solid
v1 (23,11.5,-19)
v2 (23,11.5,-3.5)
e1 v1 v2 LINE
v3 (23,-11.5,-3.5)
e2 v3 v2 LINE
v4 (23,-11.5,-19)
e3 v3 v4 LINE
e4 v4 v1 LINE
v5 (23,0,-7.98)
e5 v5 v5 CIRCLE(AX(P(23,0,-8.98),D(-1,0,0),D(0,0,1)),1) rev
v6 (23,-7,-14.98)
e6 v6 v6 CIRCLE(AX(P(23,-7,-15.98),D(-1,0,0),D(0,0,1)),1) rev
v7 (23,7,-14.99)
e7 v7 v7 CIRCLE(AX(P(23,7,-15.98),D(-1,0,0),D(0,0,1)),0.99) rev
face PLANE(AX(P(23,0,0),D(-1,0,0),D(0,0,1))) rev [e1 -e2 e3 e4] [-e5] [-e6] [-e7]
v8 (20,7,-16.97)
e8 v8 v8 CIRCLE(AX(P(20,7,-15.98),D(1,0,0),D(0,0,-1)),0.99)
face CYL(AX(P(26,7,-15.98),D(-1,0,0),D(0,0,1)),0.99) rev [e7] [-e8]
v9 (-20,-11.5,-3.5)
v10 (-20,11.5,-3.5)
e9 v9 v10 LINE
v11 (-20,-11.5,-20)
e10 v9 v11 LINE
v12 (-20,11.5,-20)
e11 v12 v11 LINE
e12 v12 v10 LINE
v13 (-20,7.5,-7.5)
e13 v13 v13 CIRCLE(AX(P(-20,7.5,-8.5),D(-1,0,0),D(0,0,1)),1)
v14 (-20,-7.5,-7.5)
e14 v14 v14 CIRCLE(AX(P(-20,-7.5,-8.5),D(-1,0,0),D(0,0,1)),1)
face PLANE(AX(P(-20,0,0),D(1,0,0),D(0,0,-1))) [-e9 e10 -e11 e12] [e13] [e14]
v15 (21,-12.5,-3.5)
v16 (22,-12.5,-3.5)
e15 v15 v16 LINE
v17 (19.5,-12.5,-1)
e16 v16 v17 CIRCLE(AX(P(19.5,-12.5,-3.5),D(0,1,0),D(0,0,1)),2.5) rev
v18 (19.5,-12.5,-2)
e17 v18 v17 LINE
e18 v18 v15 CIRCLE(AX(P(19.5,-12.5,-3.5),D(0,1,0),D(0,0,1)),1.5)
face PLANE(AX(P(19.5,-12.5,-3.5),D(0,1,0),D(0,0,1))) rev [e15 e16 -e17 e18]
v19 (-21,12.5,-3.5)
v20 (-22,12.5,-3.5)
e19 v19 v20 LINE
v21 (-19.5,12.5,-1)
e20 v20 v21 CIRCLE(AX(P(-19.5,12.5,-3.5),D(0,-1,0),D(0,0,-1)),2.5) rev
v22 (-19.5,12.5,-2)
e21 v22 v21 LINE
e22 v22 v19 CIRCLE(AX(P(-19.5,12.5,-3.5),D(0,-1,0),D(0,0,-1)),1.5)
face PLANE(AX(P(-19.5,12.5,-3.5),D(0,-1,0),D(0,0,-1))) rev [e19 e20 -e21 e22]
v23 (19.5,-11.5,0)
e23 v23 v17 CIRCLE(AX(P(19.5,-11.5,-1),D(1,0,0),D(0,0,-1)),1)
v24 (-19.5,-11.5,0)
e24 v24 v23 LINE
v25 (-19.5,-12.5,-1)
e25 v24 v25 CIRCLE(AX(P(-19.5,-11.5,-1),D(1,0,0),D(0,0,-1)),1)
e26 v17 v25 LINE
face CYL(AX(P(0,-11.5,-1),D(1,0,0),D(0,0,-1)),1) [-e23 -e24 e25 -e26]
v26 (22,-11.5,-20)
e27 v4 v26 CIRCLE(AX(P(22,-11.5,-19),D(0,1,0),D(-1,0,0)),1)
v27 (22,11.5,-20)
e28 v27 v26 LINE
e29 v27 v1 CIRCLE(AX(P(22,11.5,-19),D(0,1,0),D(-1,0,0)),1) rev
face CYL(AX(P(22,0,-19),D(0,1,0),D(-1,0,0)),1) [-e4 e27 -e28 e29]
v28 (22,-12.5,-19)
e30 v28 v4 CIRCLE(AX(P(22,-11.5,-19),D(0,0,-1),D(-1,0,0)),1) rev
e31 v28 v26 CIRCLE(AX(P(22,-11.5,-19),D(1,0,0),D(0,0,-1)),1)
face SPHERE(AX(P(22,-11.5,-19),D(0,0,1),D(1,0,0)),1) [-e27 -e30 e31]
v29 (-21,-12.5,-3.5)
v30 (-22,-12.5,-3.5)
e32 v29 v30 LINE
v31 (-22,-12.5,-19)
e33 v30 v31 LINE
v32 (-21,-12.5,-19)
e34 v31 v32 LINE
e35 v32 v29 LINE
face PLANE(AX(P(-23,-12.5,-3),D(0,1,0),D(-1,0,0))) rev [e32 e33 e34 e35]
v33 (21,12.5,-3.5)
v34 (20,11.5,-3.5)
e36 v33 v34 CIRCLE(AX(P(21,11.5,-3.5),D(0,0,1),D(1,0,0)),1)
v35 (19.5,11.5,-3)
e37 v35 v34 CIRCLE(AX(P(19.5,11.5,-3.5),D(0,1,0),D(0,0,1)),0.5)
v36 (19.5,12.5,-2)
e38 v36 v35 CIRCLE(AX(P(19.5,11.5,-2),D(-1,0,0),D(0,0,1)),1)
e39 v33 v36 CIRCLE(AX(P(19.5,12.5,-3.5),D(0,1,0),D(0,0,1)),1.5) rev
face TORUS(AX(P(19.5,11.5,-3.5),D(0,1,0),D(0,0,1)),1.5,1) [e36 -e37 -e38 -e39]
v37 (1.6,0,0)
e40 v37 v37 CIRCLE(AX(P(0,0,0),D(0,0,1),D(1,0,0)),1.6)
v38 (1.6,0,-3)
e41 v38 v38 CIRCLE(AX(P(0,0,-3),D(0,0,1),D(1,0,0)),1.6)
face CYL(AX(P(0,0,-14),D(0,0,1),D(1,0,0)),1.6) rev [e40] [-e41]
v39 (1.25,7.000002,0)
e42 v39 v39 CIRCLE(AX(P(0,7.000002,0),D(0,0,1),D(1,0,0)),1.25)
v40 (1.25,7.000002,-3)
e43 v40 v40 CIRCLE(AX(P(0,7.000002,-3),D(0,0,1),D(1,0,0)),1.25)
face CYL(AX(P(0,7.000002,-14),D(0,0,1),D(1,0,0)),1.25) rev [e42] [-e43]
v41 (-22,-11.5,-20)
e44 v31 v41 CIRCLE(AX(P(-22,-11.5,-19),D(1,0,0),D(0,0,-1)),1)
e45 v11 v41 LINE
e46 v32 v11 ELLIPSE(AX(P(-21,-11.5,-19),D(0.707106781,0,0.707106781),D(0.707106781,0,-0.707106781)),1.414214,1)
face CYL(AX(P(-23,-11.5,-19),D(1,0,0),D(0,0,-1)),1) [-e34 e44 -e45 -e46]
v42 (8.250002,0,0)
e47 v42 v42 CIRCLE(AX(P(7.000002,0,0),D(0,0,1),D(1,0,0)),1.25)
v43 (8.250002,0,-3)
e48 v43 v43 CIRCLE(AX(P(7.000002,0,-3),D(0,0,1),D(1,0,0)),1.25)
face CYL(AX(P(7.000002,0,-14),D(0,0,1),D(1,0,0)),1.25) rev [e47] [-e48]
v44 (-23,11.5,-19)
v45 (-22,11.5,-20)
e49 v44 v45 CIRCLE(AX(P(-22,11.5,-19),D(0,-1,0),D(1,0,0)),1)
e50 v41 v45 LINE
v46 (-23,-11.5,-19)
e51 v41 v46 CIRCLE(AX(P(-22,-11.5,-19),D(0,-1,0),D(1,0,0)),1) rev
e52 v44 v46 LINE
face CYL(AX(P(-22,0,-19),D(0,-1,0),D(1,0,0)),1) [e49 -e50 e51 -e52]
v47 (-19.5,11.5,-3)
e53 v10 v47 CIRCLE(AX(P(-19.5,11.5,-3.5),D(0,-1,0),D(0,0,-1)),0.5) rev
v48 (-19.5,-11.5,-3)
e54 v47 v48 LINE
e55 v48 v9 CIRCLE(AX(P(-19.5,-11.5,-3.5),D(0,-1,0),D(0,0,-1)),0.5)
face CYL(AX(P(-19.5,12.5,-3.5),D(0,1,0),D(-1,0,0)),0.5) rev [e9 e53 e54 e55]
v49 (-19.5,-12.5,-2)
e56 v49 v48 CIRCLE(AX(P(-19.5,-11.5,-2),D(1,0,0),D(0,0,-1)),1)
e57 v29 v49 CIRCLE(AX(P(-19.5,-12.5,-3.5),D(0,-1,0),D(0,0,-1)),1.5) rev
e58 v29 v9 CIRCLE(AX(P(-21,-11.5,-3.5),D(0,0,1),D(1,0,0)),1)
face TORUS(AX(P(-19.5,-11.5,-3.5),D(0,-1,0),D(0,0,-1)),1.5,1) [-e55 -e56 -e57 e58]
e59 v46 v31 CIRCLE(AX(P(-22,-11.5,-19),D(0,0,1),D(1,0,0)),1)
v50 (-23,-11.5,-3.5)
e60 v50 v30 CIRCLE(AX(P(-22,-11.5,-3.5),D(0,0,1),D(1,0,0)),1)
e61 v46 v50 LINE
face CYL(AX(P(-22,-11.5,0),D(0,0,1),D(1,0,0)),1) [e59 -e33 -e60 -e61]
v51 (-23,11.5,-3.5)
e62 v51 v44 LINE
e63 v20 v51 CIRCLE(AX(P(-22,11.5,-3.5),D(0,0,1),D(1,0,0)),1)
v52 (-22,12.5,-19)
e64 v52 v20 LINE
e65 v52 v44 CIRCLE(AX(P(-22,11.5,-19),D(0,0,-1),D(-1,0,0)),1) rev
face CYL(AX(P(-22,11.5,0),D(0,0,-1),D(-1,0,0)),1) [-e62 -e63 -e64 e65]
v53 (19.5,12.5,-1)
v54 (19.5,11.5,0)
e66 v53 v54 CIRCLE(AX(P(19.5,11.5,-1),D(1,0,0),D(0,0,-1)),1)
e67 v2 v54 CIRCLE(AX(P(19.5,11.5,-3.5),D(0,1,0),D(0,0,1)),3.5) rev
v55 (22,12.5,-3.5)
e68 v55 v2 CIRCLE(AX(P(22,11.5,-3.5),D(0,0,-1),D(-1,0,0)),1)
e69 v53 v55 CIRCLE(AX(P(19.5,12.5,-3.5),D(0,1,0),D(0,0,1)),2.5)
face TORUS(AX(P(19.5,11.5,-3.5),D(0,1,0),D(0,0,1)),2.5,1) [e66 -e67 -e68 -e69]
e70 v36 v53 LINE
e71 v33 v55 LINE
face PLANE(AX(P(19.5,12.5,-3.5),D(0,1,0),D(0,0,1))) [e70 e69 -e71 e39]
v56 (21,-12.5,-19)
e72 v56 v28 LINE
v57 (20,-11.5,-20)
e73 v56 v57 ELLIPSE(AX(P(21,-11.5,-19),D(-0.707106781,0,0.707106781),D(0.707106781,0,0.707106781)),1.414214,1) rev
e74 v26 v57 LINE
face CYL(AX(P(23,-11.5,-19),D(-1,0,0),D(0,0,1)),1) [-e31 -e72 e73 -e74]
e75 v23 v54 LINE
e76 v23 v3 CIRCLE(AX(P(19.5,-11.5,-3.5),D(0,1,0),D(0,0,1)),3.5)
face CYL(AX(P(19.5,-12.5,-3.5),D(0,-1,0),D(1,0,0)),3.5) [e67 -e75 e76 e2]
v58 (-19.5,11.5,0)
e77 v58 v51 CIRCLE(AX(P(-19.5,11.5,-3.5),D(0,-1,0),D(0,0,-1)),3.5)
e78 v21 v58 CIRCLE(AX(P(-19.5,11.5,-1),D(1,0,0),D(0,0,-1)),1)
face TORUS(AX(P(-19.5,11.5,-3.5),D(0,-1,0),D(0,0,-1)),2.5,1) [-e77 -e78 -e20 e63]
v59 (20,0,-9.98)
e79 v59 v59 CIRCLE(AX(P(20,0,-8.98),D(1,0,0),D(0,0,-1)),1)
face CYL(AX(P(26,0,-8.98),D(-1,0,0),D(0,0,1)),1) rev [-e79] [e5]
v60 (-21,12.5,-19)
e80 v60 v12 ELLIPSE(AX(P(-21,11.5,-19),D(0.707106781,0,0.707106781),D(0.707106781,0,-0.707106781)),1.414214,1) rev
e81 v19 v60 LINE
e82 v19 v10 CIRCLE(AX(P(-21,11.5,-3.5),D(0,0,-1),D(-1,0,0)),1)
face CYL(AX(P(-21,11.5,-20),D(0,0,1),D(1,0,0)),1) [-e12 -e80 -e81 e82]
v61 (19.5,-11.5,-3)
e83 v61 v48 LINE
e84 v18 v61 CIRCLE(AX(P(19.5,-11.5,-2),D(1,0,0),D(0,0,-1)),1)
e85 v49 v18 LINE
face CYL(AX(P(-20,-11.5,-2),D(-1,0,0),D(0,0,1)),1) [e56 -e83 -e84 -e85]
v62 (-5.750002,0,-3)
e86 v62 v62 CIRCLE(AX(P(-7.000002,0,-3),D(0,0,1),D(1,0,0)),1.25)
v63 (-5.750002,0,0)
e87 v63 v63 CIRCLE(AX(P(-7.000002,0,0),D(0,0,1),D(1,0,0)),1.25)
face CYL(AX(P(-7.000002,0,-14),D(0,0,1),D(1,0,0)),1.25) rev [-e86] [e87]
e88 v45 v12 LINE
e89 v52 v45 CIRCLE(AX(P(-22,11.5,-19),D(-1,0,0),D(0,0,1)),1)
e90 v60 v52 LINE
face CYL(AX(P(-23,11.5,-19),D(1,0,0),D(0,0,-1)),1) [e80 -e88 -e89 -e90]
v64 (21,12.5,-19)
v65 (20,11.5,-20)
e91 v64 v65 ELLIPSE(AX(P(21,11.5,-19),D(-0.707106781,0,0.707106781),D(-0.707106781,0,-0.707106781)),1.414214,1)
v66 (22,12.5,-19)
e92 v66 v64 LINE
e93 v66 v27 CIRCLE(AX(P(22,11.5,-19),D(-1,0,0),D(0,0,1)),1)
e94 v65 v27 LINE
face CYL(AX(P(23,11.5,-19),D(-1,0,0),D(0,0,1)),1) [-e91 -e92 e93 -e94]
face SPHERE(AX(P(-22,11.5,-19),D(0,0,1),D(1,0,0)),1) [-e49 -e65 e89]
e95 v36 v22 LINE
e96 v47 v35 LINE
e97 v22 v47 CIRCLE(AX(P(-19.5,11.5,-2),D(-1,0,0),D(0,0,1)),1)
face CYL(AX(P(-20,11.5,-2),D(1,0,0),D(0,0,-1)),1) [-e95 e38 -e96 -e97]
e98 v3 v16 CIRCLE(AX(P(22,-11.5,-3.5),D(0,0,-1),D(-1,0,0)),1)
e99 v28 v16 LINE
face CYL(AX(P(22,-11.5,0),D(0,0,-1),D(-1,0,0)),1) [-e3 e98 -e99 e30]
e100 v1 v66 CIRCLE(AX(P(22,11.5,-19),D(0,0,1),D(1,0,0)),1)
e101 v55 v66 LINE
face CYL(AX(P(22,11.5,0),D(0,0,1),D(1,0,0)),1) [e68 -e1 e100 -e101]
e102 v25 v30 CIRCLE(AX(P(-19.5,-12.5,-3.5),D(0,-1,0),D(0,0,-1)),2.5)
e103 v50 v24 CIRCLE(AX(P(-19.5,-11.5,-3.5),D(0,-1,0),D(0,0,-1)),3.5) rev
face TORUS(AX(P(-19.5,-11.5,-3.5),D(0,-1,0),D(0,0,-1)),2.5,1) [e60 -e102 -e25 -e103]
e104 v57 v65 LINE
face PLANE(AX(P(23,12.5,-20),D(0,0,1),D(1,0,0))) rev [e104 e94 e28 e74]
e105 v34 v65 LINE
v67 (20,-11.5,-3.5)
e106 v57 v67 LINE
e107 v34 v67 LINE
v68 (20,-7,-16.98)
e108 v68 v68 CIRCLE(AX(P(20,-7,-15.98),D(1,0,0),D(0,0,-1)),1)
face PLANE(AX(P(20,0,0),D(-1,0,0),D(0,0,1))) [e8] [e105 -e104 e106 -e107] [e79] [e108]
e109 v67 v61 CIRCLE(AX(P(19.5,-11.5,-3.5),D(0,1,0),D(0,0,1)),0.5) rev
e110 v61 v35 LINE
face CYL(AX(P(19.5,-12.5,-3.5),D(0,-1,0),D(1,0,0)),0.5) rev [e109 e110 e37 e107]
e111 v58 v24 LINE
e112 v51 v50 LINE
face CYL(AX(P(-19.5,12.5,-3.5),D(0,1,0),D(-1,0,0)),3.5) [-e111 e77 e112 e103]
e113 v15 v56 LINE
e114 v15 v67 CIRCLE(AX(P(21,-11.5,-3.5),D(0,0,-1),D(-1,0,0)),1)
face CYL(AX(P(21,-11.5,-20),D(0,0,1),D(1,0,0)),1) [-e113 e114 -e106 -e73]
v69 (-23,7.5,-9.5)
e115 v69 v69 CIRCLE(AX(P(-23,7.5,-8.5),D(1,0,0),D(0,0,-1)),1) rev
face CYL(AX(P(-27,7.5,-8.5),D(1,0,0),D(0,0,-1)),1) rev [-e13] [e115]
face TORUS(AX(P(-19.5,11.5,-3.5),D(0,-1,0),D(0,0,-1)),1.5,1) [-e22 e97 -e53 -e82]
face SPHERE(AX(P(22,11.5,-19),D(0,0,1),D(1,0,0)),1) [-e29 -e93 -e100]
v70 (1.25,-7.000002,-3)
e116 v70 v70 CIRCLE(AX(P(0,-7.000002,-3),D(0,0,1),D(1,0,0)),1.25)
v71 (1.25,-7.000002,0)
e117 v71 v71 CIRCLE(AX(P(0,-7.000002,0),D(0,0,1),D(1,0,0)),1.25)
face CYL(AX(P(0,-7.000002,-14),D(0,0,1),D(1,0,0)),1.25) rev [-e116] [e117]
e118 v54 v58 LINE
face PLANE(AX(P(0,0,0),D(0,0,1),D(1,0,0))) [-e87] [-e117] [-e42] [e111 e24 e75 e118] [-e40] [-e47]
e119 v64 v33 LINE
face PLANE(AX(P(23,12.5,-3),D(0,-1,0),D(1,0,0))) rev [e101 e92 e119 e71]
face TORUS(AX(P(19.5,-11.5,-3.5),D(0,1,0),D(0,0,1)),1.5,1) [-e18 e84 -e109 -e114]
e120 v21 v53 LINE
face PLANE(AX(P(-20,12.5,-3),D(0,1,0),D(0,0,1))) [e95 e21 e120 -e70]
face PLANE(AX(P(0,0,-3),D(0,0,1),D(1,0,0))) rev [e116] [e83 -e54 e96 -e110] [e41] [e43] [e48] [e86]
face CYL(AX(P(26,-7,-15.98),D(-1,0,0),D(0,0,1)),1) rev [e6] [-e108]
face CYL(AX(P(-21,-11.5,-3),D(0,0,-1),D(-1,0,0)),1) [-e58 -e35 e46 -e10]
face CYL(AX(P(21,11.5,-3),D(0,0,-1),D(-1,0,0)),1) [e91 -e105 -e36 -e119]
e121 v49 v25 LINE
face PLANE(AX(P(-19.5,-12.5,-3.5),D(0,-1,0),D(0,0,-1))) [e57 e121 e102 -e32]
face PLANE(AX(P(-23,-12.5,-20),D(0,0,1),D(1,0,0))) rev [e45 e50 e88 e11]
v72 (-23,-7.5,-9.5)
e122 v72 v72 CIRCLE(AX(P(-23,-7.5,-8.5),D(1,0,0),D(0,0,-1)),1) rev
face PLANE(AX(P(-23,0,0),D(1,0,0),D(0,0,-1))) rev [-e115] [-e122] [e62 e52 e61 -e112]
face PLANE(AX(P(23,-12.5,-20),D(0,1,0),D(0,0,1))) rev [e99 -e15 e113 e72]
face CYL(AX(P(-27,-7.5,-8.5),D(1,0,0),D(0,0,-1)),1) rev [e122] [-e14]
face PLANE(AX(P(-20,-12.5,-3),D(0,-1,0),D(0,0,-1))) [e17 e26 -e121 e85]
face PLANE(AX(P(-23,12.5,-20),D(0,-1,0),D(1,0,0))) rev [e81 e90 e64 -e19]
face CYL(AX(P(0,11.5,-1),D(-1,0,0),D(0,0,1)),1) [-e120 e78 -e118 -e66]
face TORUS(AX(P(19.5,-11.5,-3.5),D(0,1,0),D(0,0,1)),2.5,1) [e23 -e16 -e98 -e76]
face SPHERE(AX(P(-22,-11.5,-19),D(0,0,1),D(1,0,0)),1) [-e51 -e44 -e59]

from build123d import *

# Parameters (mm, degrees)
SKETCH1_W                    = 40
SKETCH1_H                    = 25
BASE_FLANGE1_DEPTH           = 3
EDGE_FLANGE1_STRIP_W         = 13
EDGE_FLANGE1_STRIP_H         = 3
EDGE_FLANGE1_STRIP_CUT_DEPTH = 25
EDGE_FLANGE1_DEPTH           = 25
EDGE_FLANGE2_STRIP_W         = 13
EDGE_FLANGE2_STRIP_H         = 3
EDGE_FLANGE2_STRIP_CUT_DEPTH = 25
EDGE_FLANGE2_DEPTH           = 25
CUT_EXTRUDE1_DEPTH           = 7
CUT_EXTRUDE2_DEPTH           = 6
FILLET1_R                    = 1
FILLET2_R                    = 1
CUT_EXTRUDE3_DEPTH           = 14


# Sheet-metal steps are written as plain solids
with BuildPart() as part:
    # Sketch1 → Base-Flange1 (new body)
    with BuildSketch(Plane.XY):
        Rectangle(SKETCH1_W, SKETCH1_H)
    extrude(amount=-BASE_FLANGE1_DEPTH)

    # Edge-Flange1 strip (across the edge) → Edge-Flange1 strip cut (cut)
    with BuildSketch(Plane(origin=(20, 12.5, -3), x_dir=(-1, 0, 0), z_dir=(0, -1, 0))):
        with Locations((-6, -1.5)):
            Rectangle(EDGE_FLANGE1_STRIP_W, EDGE_FLANGE1_STRIP_H)
    extrude(amount=EDGE_FLANGE1_STRIP_CUT_DEPTH, mode=Mode.SUBTRACT)

    # Edge-Flange1 section (across the edge) → Edge-Flange1 (add)
    with BuildSketch(Plane(origin=(20, 12.5, -3), x_dir=(-1, 0, 0), z_dir=(0, -1, 0))):
        with BuildLine():
            Line((-3, 0.5), (-3, 17))
            Line((-3, 17), (0, 17))
            Line((0, 17), (0, 0.5))
            ThreePointArc((0, 0.5), (0.146446609, 0.146446609), (0.5, 0))
            Line((0.5, 0), (0.5, -3))
            ThreePointArc((0.5, -3), (-1.974873734, -1.974873734), (-3, 0.5))
        make_face()
    extrude(amount=EDGE_FLANGE1_DEPTH)

    # Edge-Flange2 strip (across the edge) → Edge-Flange2 strip cut (cut)
    with BuildSketch(Plane(origin=(-20, -12.5, -3), x_dir=(1, 0, 0), z_dir=(0, 1, 0))):
        with Locations((-6, -1.5)):
            Rectangle(EDGE_FLANGE2_STRIP_W, EDGE_FLANGE2_STRIP_H)
    extrude(amount=EDGE_FLANGE2_STRIP_CUT_DEPTH, mode=Mode.SUBTRACT)

    # Edge-Flange2 section (across the edge) → Edge-Flange2 (add)
    with BuildSketch(Plane(origin=(-20, -12.5, -3), x_dir=(1, 0, 0), z_dir=(0, 1, 0))):
        with BuildLine():
            Line((-3, 0.5), (-3, 17))
            Line((-3, 17), (0, 17))
            Line((0, 17), (0, 0.5))
            ThreePointArc((0, 0.5), (0.146446609, 0.146446609), (0.5, 0))
            Line((0.5, 0), (0.5, -3))
            ThreePointArc((0.5, -3), (-1.974873734, -1.974873734), (-3, 0.5))
        make_face()
    extrude(amount=EDGE_FLANGE2_DEPTH)

    # Sketch12 → Cut-Extrude1 (cut)
    with BuildSketch(Plane(origin=(-20, 10.212212675, -95), x_dir=(0, -1, 0), z_dir=(-1, 0, 0))):
        with BuildLine():
            ThreePointArc((17.712212658, 87.5), (16.712212675, 86.499999984), (17.712212691, 85.5))
            ThreePointArc((17.712212691, 85.5), (18.712212675, 86.500000016), (17.712212658, 87.5))
        make_face()
        with BuildLine():
            ThreePointArc((2.712212658, 87.5), (1.712212675, 86.499999984), (2.712212691, 85.5))
            ThreePointArc((2.712212691, 85.5), (3.712212675, 86.500000016), (2.712212658, 87.5))
        make_face()
    extrude(amount=CUT_EXTRUDE1_DEPTH, mode=Mode.SUBTRACT)

    # Sketch13 → Cut-Extrude2 (cut)
    with BuildSketch(Plane(origin=(20, 10.212212675, -95), x_dir=(0, 1, 0), z_dir=(1, 0, 0))):
        with BuildLine():
            ThreePointArc((-3.21221269, 80.01), (-4.202212675, 79.019999984), (-3.212212659, 78.03))
            ThreePointArc((-3.212212659, 78.03), (-2.222212675, 79.020000016), (-3.21221269, 80.01))
        make_face()
        with BuildLine():
            ThreePointArc((-17.212212691, 80.02), (-18.212212675, 79.019999984), (-17.212212658, 78.02))
            ThreePointArc((-17.212212658, 78.02), (-16.212212675, 79.020000016), (-17.212212691, 80.02))
        make_face()
        with BuildLine():
            ThreePointArc((-10.212212691, 87.02), (-11.212212675, 86.019999984), (-10.212212658, 85.02))
            ThreePointArc((-10.212212658, 85.02), (-9.212212675, 86.020000016), (-10.212212691, 87.02))
        make_face()
    extrude(amount=CUT_EXTRUDE2_DEPTH, mode=Mode.SUBTRACT)

    # Fillet1
    fillet1_edges = [part.edges().sort_by_distance(p)[0] for p in [
        (0, 12.5, 0),
        (21.974873734, 12.5, -1.025126266),
        (21.974873734, -12.5, -1.025126266),
        (23, -12.5, -11.75),
        (23, 0, -20),
        (23, 12.5, -11.75),
        (0, -12.5, 0),
        (-21.974873734, -12.5, -1.025126266),
        (-21.974873734, 12.5, -1.025126266),
        (-23, 12.5, -11.75),
        (-23, 0, -20),
        (-23, -12.5, -11.75),
    ]]
    fillet(fillet1_edges, radius=FILLET1_R)

    # Fillet2
    # the kernel refuses this fillet: 1 mm, written as the material it takes off along each edge
    with BuildSketch(Plane(origin=(-22, 11.5, -19), x_dir=(0, 0, -1), z_dir=(0, 1, 0))) as fillet2_piece_1_section:
        Polygon((0, 0), (FILLET2_R, 0), (FILLET2_R, FILLET2_R), (0, FILLET2_R), align=None)
    fillet2_piece_1 = extrude(amount=FILLET2_R, mode=Mode.PRIVATE)
    fillet2_piece_1 = fillet2_piece_1 - Plane(origin=(-22, 11.5, -19), x_dir=(0.70710678118655, 0, 0.707106781186545), z_dir=(0, 1, 0)) * Sphere(FILLET2_R, mode=Mode.PRIVATE)
    add(fillet2_piece_1, mode=Mode.SUBTRACT)
    with BuildSketch(Plane(origin=(-22, -11.5, -19), x_dir=(0, -1, 0), z_dir=(0, 0, -1))) as fillet2_piece_2_section:
        Polygon((0, 0), (FILLET2_R, 0), (FILLET2_R, FILLET2_R), (0, FILLET2_R), align=None)
    fillet2_piece_2 = extrude(amount=FILLET2_R, mode=Mode.PRIVATE)
    fillet2_piece_2 = fillet2_piece_2 - Plane(origin=(-22, -11.5, -19), x_dir=(0.7071067811865475, 0.7071067811865477, -2.4688501310822653e-15), z_dir=(0, 0, -1)) * Sphere(FILLET2_R, mode=Mode.PRIVATE)
    add(fillet2_piece_2, mode=Mode.SUBTRACT)
    with BuildSketch(Plane(origin=(22, 11.5, -19), x_dir=(0, 0, -1), z_dir=(0, 1, 0))) as fillet2_piece_3_section:
        Polygon((0, 0), (FILLET2_R, 0), (FILLET2_R, -FILLET2_R), (0, -FILLET2_R), align=None)
    fillet2_piece_3 = extrude(amount=FILLET2_R, mode=Mode.PRIVATE)
    fillet2_piece_3 = fillet2_piece_3 - Plane(origin=(22, 11.5, -19), x_dir=(-0.70710678118655, 0, 0.707106781186545), z_dir=(0, 1, 0)) * Sphere(FILLET2_R, mode=Mode.PRIVATE)
    add(fillet2_piece_3, mode=Mode.SUBTRACT)
    with BuildSketch(Plane(origin=(22, -11.5, -19), x_dir=(0, -1, 0), z_dir=(0, 0, -1))) as fillet2_piece_4_section:
        Polygon((0, 0), (FILLET2_R, 0), (FILLET2_R, -FILLET2_R), (0, -FILLET2_R), align=None)
    fillet2_piece_4 = extrude(amount=FILLET2_R, mode=Mode.PRIVATE)
    fillet2_piece_4 = fillet2_piece_4 - Plane(origin=(22, -11.5, -19), x_dir=(-0.7071067811865475, 0.7071067811865477, -2.4688501310822653e-15), z_dir=(0, 0, -1)) * Sphere(FILLET2_R, mode=Mode.PRIVATE)
    add(fillet2_piece_4, mode=Mode.SUBTRACT)
    with BuildSketch(Plane(origin=(22, -12.5, -20), x_dir=(0, 1, 0), z_dir=(-1, 0, 0)), Plane(origin=(22, 12.5, -20), x_dir=(0, 0, 1), z_dir=(-1, 0, 0))) as fillet2_piece_5:
        with BuildLine():
            CenterArc((FILLET2_R, -FILLET2_R), FILLET2_R, 90, 90)
            Line((0, -FILLET2_R), (0, 0))
            Line((0, 0), (FILLET2_R, 0))
        make_face()
    extrude(amount=4.5, mode=Mode.SUBTRACT)
    with BuildSketch(Plane(origin=(-22, -12.5, -20), x_dir=(0, 1, 0), z_dir=(1, 0, 0)), Plane(origin=(-22, 12.5, -20), x_dir=(0, 0, 1), z_dir=(1, 0, 0))) as fillet2_piece_6:
        with BuildLine():
            CenterArc((FILLET2_R, FILLET2_R), FILLET2_R, 180, 90)
            Line((0, FILLET2_R), (0, 0))
            Line((0, 0), (FILLET2_R, 0))
        make_face()
    extrude(amount=4.5, mode=Mode.SUBTRACT)
    with BuildSketch(Plane(origin=(-19.5, 12.5, -3), x_dir=(0, 0, 1), z_dir=(1, 0, 0))) as fillet2_piece_7:
        with BuildLine():
            CenterArc((FILLET2_R, FILLET2_R), FILLET2_R, 180, 90)
            Line((0, FILLET2_R), (0, 0))
            Line((0, 0), (FILLET2_R, 0))
        make_face()
    extrude(amount=39, mode=Mode.SUBTRACT)
    with BuildSketch(Plane(origin=(19.5, 12.5, -3.5), x_dir=(1, 0, 0), z_dir=(0, 0, -1))) as fillet2_piece_8:
        with BuildLine():
            CenterArc((0.5 + FILLET2_R, FILLET2_R), FILLET2_R, 180, 90)
            Line((0.5, FILLET2_R), (0.5, 0))
            Line((0.5, 0), (0.5 + FILLET2_R, 0))
        make_face()
    revolve(axis=Axis((19.5, 12.5, -3.5), (0, -1, 0)), revolution_arc=90, mode=Mode.SUBTRACT)
    with BuildSketch(Plane(origin=(19.5, -12.5, -3.5), x_dir=(1, 0, 0), z_dir=(0, 0, -1))) as fillet2_piece_9:
        with BuildLine():
            CenterArc((0.5 + FILLET2_R, -FILLET2_R), FILLET2_R, 90, 90)
            Line((0.5 + FILLET2_R, 0), (0.5, 0))
            Line((0.5, 0), (0.5, -FILLET2_R))
        make_face()
    revolve(axis=Axis((19.5, -12.5, -3.5), (0, -1, 0)), revolution_arc=90, mode=Mode.SUBTRACT)
    with BuildSketch(Plane(origin=(20, -12.5, -22.5), x_dir=(0, 1, 0), z_dir=(0, 0, 1)), Plane(origin=(20, 12.5, -22.5), x_dir=(1, 0, 0), z_dir=(0, 0, 1))) as fillet2_piece_10:
        with BuildLine():
            CenterArc((FILLET2_R, -FILLET2_R), FILLET2_R, 90, 90)
            Line((0, -FILLET2_R), (0, 0))
            Line((0, 0), (FILLET2_R, 0))
        make_face()
    extrude(amount=19, mode=Mode.SUBTRACT)
    with BuildSketch(Plane(origin=(19.5, -12.5, -3), x_dir=(0, 1, 0), z_dir=(-1, 0, 0))) as fillet2_piece_11:
        with BuildLine():
            CenterArc((FILLET2_R, -FILLET2_R), FILLET2_R, 90, 90)
            Line((0, -FILLET2_R), (0, 0))
            Line((0, 0), (FILLET2_R, 0))
        make_face()
    extrude(amount=39, mode=Mode.SUBTRACT)
    with BuildSketch(Plane(origin=(-19.5, -12.5, -3.5), x_dir=(-1, 0, 0), z_dir=(0, 0, -1))) as fillet2_piece_12:
        with BuildLine():
            CenterArc((0.5 + FILLET2_R, FILLET2_R), FILLET2_R, 180, 90)
            Line((0.5 + FILLET2_R, 0), (0.5, 0))
            Line((0.5, 0), (0.5, FILLET2_R))
        make_face()
    revolve(axis=Axis((-19.5, -12.5, -3.5), (0, 1, 0)), revolution_arc=90, mode=Mode.SUBTRACT)
    with BuildSketch(Plane(origin=(-19.5, 12.5, -3.5), x_dir=(-1, 0, 0), z_dir=(0, 0, -1))) as fillet2_piece_13:
        with BuildLine():
            CenterArc((0.5 + FILLET2_R, -FILLET2_R), FILLET2_R, 90, 90)
            Line((0.5, -FILLET2_R), (0.5, 0))
            Line((0.5, 0), (0.5 + FILLET2_R, 0))
        make_face()
    revolve(axis=Axis((-19.5, 12.5, -3.5), (0, 1, 0)), revolution_arc=90, mode=Mode.SUBTRACT)
    with BuildSketch(Plane(origin=(-20, 12.5, -22.5), x_dir=(-1, 0, 0), z_dir=(0, 0, 1)), Plane(origin=(-20, -12.5, -22.5), x_dir=(0, 1, 0), z_dir=(0, 0, 1))) as fillet2_piece_14:
        with BuildLine():
            CenterArc((FILLET2_R, FILLET2_R), FILLET2_R, 180, 90)
            Line((0, FILLET2_R), (0, 0))
            Line((0, 0), (FILLET2_R, 0))
        make_face()
    extrude(amount=19, mode=Mode.SUBTRACT)

    # Sketch14 → Cut-Extrude3 (cut)
    with BuildSketch(Plane(origin=(1.842409503, 10.212212675, 0), x_dir=(0, 1, 0), z_dir=(0, 0, 1))):
        with BuildLine():
            ThreePointArc((-8.962212675, 8.842411376), (-10.212212675, 10.092411376), (-11.462212675, 8.842411376))
            ThreePointArc((-11.462212675, 8.842411376), (-10.212212675, 7.592411376), (-8.962212675, 8.842411376))
        make_face()
        with BuildLine():
            ThreePointArc((-3.212210801, 0.592409503), (-1.962210801, 1.842409503), (-3.212210801, 3.092409503))
            ThreePointArc((-3.212210801, 3.092409503), (-4.462210801, 1.842409503), (-3.212210801, 0.592409503))
        make_face()
        with BuildLine():
            ThreePointArc((-17.212214548, 0.592409503), (-15.962214548, 1.842409503), (-17.212214548, 3.092409503))
            ThreePointArc((-17.212214548, 3.092409503), (-18.462214548, 1.842409503), (-17.212214548, 0.592409503))
        make_face()
        with BuildLine():
            ThreePointArc((-11.462212675, -5.15759237), (-10.212212675, -6.40759237), (-8.962212675, -5.15759237))
            ThreePointArc((-8.962212675, -5.15759237), (-10.212212675, -3.90759237), (-11.462212675, -5.15759237))
        make_face()
        with BuildLine():
            ThreePointArc((-10.212212675, 0.242409503), (-8.612212675, 1.842409503), (-10.212212675, 3.442409503))
            ThreePointArc((-10.212212675, 3.442409503), (-11.812212675, 1.842409503), (-10.212212675, 0.242409503))
        make_face()
    extrude(amount=-CUT_EXTRUDE3_DEPTH, mode=Mode.SUBTRACT)


solid = part.part
